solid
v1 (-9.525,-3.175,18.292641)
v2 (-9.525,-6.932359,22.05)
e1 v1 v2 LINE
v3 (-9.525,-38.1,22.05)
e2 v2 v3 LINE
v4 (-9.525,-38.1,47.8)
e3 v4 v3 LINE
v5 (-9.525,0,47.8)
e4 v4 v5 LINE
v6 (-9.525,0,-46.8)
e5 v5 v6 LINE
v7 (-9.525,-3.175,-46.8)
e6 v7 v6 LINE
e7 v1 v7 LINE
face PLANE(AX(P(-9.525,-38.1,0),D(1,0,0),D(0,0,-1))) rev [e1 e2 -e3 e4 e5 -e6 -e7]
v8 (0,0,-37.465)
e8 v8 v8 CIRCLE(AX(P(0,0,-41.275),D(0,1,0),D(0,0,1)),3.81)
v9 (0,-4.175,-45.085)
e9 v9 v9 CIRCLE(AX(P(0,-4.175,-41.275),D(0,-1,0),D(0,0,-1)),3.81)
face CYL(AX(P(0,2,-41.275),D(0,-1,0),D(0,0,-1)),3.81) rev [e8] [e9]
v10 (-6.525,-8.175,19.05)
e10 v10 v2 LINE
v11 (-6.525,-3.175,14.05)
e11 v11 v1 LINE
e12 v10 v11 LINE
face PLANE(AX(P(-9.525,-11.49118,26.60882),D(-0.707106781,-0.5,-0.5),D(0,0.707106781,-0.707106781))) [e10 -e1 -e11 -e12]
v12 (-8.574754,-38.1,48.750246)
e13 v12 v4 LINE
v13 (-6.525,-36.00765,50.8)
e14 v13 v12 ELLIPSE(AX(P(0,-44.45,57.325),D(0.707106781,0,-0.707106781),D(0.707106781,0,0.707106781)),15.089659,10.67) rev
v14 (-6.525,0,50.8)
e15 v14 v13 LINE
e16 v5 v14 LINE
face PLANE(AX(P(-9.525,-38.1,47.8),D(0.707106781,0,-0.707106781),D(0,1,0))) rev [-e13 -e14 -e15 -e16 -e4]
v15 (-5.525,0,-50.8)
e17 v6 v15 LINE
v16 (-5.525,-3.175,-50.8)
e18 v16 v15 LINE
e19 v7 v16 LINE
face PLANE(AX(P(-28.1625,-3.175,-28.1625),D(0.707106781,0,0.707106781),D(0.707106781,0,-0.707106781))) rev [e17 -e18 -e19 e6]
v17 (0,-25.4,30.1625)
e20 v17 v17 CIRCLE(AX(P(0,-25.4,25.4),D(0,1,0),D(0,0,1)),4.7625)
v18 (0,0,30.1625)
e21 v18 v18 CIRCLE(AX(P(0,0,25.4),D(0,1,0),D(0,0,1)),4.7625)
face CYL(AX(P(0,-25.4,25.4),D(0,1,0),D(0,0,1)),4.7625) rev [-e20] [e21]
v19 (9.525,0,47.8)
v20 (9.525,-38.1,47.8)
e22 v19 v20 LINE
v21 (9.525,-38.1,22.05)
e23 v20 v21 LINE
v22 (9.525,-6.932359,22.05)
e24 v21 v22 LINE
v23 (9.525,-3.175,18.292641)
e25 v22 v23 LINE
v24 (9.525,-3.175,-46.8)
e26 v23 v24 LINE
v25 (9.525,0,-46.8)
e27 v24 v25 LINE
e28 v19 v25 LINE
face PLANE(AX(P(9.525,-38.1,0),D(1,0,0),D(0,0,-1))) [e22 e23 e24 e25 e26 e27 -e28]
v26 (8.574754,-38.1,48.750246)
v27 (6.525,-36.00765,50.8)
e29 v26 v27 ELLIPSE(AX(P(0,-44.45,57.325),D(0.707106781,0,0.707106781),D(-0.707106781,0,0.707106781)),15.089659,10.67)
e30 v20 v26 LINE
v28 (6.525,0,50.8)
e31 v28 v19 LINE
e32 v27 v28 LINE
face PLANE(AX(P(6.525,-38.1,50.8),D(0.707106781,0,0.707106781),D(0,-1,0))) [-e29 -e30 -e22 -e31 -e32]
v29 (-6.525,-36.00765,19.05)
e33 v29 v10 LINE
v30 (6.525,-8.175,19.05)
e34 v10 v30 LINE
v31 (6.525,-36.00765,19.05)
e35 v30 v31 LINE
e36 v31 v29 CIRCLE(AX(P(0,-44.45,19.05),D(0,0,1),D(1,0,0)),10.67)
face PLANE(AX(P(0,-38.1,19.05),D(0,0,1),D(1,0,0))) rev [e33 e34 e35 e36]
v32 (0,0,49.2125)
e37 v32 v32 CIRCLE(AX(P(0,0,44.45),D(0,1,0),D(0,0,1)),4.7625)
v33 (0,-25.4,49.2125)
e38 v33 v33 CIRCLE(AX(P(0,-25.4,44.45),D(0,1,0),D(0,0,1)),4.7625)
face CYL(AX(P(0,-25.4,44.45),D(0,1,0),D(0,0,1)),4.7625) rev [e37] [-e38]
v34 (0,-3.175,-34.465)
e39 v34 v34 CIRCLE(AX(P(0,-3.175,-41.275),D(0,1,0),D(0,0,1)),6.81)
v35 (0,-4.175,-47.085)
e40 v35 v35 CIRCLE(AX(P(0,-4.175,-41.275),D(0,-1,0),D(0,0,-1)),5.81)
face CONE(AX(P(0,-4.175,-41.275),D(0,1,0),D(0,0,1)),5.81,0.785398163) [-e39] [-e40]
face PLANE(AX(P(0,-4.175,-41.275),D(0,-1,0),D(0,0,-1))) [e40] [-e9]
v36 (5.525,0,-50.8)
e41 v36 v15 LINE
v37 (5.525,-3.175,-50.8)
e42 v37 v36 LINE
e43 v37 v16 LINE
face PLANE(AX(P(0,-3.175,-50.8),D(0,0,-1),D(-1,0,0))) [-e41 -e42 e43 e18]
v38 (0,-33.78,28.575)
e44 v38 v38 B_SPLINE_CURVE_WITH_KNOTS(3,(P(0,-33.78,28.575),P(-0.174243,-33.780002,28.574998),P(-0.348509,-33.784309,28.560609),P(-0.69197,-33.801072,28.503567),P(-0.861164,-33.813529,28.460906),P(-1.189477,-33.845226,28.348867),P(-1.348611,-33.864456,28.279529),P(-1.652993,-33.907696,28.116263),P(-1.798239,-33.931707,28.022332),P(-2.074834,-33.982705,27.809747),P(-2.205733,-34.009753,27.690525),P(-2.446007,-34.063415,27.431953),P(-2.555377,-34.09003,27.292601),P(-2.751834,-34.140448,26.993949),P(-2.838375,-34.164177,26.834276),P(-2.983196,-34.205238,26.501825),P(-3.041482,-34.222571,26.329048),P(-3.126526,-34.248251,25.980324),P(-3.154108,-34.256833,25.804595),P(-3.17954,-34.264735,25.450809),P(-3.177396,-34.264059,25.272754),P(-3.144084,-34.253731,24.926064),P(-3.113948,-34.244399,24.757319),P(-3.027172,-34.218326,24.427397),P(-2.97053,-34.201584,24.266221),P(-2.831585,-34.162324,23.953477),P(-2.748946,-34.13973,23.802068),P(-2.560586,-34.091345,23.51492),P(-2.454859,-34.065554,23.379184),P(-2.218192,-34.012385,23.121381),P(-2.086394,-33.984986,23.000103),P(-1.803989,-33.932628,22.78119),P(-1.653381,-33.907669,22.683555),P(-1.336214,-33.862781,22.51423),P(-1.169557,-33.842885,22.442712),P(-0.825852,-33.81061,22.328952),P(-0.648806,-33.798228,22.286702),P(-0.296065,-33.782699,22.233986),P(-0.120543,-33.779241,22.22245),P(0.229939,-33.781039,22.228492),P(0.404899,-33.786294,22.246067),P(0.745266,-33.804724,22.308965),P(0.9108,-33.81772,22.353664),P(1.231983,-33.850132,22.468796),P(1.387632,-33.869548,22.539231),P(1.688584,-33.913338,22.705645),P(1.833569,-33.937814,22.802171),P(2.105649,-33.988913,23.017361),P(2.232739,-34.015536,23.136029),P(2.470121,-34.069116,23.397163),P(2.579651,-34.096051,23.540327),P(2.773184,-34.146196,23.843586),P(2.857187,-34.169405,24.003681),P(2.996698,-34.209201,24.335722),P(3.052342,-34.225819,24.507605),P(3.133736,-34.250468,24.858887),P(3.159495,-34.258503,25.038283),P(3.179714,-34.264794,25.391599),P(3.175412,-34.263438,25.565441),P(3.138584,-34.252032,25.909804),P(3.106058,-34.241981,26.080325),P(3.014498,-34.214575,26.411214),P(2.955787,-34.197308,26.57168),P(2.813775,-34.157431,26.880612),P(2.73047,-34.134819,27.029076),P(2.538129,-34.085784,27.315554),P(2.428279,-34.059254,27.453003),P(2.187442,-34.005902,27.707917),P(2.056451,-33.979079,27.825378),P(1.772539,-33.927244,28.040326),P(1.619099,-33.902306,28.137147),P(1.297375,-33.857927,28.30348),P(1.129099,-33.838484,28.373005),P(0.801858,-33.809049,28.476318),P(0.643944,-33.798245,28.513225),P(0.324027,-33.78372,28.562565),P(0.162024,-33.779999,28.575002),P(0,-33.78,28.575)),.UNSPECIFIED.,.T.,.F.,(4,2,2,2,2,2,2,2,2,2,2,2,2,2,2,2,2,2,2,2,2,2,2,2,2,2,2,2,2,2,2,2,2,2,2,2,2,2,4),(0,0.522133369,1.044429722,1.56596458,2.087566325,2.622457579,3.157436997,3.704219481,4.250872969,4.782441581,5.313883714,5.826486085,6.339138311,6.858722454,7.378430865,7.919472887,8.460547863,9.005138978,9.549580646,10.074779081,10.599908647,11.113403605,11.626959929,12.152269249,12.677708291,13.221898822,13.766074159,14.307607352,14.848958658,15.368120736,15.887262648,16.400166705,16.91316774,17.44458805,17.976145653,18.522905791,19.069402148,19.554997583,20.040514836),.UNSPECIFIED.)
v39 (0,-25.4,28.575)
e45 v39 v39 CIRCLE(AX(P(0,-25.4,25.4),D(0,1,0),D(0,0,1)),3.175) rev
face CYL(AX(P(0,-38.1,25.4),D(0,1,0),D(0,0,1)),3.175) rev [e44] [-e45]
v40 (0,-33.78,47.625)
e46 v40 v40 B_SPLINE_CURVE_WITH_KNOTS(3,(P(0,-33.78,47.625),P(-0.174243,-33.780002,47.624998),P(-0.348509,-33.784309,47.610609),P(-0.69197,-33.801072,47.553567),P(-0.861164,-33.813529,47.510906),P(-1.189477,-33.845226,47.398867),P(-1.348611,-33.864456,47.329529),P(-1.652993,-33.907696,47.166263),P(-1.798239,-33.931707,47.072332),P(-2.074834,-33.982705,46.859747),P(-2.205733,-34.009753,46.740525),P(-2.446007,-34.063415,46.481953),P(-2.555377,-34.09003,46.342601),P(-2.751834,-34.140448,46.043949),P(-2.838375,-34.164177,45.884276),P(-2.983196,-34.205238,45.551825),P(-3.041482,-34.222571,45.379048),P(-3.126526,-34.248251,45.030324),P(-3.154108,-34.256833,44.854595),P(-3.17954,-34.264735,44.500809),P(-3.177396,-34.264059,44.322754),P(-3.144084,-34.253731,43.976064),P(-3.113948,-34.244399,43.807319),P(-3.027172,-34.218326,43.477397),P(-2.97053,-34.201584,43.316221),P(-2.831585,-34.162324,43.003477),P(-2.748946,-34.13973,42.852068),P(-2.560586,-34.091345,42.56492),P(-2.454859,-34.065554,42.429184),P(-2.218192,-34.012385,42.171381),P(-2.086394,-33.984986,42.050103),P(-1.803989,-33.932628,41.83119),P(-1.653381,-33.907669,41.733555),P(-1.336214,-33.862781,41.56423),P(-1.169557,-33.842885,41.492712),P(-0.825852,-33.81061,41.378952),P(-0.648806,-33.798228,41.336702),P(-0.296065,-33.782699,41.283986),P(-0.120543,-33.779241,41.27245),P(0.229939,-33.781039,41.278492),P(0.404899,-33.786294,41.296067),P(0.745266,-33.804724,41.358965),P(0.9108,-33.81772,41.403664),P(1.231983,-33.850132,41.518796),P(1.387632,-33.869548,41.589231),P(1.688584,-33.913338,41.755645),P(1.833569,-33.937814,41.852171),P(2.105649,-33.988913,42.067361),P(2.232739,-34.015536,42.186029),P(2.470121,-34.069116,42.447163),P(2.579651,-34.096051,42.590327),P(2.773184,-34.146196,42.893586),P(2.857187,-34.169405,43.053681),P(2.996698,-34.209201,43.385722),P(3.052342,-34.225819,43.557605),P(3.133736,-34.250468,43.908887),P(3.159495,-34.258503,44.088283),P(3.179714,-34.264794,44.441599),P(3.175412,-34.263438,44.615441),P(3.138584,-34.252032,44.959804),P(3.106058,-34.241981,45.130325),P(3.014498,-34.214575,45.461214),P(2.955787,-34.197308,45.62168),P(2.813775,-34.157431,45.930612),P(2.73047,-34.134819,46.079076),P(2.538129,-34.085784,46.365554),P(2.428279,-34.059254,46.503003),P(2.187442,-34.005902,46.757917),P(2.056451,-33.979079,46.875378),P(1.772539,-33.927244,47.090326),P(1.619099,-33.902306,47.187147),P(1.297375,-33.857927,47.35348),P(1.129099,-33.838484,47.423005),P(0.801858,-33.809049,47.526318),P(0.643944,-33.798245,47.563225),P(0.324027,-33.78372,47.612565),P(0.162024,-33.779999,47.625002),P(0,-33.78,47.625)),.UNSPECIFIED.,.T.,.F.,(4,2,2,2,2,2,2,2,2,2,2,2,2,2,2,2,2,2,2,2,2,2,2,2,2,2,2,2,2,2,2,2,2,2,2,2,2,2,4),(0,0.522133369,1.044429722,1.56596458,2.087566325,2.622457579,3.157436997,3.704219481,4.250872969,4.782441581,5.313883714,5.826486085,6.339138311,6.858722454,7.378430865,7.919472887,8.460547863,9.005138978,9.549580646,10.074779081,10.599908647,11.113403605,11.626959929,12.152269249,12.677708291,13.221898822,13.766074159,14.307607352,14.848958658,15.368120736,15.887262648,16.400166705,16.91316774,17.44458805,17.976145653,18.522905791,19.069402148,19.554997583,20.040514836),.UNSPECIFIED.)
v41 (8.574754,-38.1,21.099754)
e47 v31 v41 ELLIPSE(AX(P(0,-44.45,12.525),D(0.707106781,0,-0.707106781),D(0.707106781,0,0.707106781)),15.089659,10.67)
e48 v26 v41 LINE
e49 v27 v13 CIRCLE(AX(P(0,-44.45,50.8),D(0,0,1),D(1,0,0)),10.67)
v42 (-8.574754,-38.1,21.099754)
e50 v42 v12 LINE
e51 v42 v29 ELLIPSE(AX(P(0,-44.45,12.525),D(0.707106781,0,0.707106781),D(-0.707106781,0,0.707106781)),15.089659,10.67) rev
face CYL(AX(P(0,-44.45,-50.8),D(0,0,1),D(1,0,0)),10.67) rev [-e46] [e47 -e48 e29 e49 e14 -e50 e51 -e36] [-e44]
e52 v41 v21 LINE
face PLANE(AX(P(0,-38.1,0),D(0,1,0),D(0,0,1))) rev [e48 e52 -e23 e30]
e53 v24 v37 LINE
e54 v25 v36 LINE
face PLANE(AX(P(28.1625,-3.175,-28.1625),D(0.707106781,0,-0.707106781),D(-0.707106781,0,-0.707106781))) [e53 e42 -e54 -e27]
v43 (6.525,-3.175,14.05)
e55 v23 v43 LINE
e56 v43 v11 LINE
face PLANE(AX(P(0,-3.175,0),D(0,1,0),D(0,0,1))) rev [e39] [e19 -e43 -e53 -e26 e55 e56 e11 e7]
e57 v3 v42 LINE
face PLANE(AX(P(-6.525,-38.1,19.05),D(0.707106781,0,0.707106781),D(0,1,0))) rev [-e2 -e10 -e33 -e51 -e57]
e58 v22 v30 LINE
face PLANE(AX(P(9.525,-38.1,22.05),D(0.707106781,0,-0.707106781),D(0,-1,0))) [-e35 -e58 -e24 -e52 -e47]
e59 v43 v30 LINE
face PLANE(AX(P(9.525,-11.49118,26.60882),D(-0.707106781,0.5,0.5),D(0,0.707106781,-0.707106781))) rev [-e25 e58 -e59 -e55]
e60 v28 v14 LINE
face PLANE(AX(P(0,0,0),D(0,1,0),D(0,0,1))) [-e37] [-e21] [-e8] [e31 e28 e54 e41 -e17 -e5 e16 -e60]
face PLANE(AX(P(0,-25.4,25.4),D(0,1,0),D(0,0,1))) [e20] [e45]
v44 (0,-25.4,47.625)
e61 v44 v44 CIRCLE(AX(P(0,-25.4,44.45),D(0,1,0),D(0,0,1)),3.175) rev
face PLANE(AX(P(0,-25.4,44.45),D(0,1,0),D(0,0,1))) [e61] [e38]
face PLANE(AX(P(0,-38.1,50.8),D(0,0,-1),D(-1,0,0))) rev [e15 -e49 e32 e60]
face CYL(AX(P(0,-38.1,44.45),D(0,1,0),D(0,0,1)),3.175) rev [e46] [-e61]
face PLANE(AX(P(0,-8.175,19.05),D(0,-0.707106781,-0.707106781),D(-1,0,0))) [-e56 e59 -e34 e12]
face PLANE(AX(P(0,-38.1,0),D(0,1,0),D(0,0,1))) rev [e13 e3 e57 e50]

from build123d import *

# Parameters (mm, degrees)
SKETCH1_W           = 19.05
SKETCH1_H           = 31.75
SKETCH1_R           = 3.175
BOSS_EXTRUDE1_DEPTH = 38.1
SKETCH1_8_R         = 3.175
BOSS_EXTRUDE4_DEPTH = 3.175
SKETCH2_R           = 4.7625
CUT_EXTRUDE1_DEPTH  = 25.4
CHAMFER1_SIZE       = 5
CHAMFER2_SIZE       = 3
SKETCH3_R           = 10.67
CUT_EXTRUDE2_DEPTH  = 109.92610167
SKETCH6_R           = 3.81
CUT_EXTRUDE3_DEPTH  = 5.175
BOSS_EXTRUDE6_START = 1
SKETCH6_3_R         = 5.81
SKETCH6_3_R_2       = 3.81
BOSS_EXTRUDE6_DEPTH = 1
CHAMFER3_SIZE       = 1


with BuildPart() as part:
    # Sketch1 → Boss-Extrude1 (new body)
    with BuildSketch(Plane(origin=(0, 0, 0), x_dir=(1, 0, 0), z_dir=(0, 1, 0))):
        with Locations((0, -34.925)):
            Rectangle(SKETCH1_W, SKETCH1_H)
        with Locations(Location((0, -44.45, 0), (0, 0, 270))):
            Circle(SKETCH1_R, mode=Mode.SUBTRACT)
        with Locations(Location((0, -25.4, 0), (0, 0, 270))):
            Circle(SKETCH1_R, mode=Mode.SUBTRACT)
    extrude(amount=-BOSS_EXTRUDE1_DEPTH)

    # Sketch1<8> → Boss-Extrude4 (add)
    with BuildSketch(Plane(origin=(0, 0, 0), x_dir=(1, 0, 0), z_dir=(0, 1, 0))):
        Polygon((9.525, -50.8), (-9.525, -50.8), (-9.525, 46.8), (-5.525, 50.8), (5.525, 50.8), (9.525, 46.8), align=None)
        with Locations(Location((0, -25.4, 0), (0, 0, 270))):
            Circle(SKETCH1_8_R, mode=Mode.SUBTRACT)
        with Locations(Location((0, -44.45, 0), (0, 0, 270))):
            Circle(SKETCH1_8_R, mode=Mode.SUBTRACT)
    extrude(amount=-BOSS_EXTRUDE4_DEPTH)

    # Sketch2 → Cut-Extrude1 (cut)
    with BuildSketch(Plane(origin=(0, 0, 0), x_dir=(1, 0, 0), z_dir=(0, 1, 0))):
        with Locations(Location((0, -25.4, 0), (0, 0, 270))):
            Circle(SKETCH2_R)
        with Locations(Location((0, -44.45, 0), (0, 0, 270))):
            Circle(SKETCH2_R)
    extrude(amount=-CUT_EXTRUDE1_DEPTH, mode=Mode.SUBTRACT)

    # Chamfer1
    chamfer1_edges = [part.edges().sort_by_distance(p)[0] for p in [
        (0, -3.175, 19.05),
    ]]
    chamfer(chamfer1_edges, length=CHAMFER1_SIZE)

    # Chamfer2
    chamfer2_edges = [part.edges().sort_by_distance(p)[0] for p in [
        (-9.525, -23.1375, 19.05),
        (9.525, -23.1375, 19.05),
        (9.525, -19.05, 50.8),
        (-9.525, -19.05, 50.8),
        (9.525, -5.675, 16.55),
        (-9.525, -5.675, 16.55),
    ]]
    chamfer(chamfer2_edges, length=CHAMFER2_SIZE)

    # Sketch3 → Cut-Extrude2 (cut, through all)
    with BuildSketch(Plane.XY.offset(50.8)):
        with Locations((0, -44.45)):
            Circle(SKETCH3_R)
    extrude(amount=-CUT_EXTRUDE2_DEPTH, mode=Mode.SUBTRACT)

    # Sketch6 → Cut-Extrude3 (cut)
    with BuildSketch(Plane.XZ.offset(3.175)):
        with Locations(Location((0, -41.275, 0), (0, 0, 270))):
            Circle(SKETCH6_R)
    extrude(amount=-CUT_EXTRUDE3_DEPTH, mode=Mode.SUBTRACT)

    # Sketch6<3> → Boss-Extrude6 (add)
    with BuildSketch(Plane.XZ.offset(3.175).offset(BOSS_EXTRUDE6_START)):
        with Locations(Location((0, -41.275, 0), (0, 0, 90))):
            Circle(SKETCH6_3_R)
        with Locations(Location((0, -41.275, 0), (0, 0, 270))):
            Circle(SKETCH6_3_R_2, mode=Mode.SUBTRACT)
    extrude(amount=-BOSS_EXTRUDE6_DEPTH)

    # Chamfer3
    chamfer3_edges = [part.edges().sort_by_distance(p)[0] for p in [
        (0, -3.175, -47.085),
    ]]
    chamfer(chamfer3_edges, length=CHAMFER3_SIZE - 0.0001)  # a hair under: the kernel refuses the full size


solid = part.part
